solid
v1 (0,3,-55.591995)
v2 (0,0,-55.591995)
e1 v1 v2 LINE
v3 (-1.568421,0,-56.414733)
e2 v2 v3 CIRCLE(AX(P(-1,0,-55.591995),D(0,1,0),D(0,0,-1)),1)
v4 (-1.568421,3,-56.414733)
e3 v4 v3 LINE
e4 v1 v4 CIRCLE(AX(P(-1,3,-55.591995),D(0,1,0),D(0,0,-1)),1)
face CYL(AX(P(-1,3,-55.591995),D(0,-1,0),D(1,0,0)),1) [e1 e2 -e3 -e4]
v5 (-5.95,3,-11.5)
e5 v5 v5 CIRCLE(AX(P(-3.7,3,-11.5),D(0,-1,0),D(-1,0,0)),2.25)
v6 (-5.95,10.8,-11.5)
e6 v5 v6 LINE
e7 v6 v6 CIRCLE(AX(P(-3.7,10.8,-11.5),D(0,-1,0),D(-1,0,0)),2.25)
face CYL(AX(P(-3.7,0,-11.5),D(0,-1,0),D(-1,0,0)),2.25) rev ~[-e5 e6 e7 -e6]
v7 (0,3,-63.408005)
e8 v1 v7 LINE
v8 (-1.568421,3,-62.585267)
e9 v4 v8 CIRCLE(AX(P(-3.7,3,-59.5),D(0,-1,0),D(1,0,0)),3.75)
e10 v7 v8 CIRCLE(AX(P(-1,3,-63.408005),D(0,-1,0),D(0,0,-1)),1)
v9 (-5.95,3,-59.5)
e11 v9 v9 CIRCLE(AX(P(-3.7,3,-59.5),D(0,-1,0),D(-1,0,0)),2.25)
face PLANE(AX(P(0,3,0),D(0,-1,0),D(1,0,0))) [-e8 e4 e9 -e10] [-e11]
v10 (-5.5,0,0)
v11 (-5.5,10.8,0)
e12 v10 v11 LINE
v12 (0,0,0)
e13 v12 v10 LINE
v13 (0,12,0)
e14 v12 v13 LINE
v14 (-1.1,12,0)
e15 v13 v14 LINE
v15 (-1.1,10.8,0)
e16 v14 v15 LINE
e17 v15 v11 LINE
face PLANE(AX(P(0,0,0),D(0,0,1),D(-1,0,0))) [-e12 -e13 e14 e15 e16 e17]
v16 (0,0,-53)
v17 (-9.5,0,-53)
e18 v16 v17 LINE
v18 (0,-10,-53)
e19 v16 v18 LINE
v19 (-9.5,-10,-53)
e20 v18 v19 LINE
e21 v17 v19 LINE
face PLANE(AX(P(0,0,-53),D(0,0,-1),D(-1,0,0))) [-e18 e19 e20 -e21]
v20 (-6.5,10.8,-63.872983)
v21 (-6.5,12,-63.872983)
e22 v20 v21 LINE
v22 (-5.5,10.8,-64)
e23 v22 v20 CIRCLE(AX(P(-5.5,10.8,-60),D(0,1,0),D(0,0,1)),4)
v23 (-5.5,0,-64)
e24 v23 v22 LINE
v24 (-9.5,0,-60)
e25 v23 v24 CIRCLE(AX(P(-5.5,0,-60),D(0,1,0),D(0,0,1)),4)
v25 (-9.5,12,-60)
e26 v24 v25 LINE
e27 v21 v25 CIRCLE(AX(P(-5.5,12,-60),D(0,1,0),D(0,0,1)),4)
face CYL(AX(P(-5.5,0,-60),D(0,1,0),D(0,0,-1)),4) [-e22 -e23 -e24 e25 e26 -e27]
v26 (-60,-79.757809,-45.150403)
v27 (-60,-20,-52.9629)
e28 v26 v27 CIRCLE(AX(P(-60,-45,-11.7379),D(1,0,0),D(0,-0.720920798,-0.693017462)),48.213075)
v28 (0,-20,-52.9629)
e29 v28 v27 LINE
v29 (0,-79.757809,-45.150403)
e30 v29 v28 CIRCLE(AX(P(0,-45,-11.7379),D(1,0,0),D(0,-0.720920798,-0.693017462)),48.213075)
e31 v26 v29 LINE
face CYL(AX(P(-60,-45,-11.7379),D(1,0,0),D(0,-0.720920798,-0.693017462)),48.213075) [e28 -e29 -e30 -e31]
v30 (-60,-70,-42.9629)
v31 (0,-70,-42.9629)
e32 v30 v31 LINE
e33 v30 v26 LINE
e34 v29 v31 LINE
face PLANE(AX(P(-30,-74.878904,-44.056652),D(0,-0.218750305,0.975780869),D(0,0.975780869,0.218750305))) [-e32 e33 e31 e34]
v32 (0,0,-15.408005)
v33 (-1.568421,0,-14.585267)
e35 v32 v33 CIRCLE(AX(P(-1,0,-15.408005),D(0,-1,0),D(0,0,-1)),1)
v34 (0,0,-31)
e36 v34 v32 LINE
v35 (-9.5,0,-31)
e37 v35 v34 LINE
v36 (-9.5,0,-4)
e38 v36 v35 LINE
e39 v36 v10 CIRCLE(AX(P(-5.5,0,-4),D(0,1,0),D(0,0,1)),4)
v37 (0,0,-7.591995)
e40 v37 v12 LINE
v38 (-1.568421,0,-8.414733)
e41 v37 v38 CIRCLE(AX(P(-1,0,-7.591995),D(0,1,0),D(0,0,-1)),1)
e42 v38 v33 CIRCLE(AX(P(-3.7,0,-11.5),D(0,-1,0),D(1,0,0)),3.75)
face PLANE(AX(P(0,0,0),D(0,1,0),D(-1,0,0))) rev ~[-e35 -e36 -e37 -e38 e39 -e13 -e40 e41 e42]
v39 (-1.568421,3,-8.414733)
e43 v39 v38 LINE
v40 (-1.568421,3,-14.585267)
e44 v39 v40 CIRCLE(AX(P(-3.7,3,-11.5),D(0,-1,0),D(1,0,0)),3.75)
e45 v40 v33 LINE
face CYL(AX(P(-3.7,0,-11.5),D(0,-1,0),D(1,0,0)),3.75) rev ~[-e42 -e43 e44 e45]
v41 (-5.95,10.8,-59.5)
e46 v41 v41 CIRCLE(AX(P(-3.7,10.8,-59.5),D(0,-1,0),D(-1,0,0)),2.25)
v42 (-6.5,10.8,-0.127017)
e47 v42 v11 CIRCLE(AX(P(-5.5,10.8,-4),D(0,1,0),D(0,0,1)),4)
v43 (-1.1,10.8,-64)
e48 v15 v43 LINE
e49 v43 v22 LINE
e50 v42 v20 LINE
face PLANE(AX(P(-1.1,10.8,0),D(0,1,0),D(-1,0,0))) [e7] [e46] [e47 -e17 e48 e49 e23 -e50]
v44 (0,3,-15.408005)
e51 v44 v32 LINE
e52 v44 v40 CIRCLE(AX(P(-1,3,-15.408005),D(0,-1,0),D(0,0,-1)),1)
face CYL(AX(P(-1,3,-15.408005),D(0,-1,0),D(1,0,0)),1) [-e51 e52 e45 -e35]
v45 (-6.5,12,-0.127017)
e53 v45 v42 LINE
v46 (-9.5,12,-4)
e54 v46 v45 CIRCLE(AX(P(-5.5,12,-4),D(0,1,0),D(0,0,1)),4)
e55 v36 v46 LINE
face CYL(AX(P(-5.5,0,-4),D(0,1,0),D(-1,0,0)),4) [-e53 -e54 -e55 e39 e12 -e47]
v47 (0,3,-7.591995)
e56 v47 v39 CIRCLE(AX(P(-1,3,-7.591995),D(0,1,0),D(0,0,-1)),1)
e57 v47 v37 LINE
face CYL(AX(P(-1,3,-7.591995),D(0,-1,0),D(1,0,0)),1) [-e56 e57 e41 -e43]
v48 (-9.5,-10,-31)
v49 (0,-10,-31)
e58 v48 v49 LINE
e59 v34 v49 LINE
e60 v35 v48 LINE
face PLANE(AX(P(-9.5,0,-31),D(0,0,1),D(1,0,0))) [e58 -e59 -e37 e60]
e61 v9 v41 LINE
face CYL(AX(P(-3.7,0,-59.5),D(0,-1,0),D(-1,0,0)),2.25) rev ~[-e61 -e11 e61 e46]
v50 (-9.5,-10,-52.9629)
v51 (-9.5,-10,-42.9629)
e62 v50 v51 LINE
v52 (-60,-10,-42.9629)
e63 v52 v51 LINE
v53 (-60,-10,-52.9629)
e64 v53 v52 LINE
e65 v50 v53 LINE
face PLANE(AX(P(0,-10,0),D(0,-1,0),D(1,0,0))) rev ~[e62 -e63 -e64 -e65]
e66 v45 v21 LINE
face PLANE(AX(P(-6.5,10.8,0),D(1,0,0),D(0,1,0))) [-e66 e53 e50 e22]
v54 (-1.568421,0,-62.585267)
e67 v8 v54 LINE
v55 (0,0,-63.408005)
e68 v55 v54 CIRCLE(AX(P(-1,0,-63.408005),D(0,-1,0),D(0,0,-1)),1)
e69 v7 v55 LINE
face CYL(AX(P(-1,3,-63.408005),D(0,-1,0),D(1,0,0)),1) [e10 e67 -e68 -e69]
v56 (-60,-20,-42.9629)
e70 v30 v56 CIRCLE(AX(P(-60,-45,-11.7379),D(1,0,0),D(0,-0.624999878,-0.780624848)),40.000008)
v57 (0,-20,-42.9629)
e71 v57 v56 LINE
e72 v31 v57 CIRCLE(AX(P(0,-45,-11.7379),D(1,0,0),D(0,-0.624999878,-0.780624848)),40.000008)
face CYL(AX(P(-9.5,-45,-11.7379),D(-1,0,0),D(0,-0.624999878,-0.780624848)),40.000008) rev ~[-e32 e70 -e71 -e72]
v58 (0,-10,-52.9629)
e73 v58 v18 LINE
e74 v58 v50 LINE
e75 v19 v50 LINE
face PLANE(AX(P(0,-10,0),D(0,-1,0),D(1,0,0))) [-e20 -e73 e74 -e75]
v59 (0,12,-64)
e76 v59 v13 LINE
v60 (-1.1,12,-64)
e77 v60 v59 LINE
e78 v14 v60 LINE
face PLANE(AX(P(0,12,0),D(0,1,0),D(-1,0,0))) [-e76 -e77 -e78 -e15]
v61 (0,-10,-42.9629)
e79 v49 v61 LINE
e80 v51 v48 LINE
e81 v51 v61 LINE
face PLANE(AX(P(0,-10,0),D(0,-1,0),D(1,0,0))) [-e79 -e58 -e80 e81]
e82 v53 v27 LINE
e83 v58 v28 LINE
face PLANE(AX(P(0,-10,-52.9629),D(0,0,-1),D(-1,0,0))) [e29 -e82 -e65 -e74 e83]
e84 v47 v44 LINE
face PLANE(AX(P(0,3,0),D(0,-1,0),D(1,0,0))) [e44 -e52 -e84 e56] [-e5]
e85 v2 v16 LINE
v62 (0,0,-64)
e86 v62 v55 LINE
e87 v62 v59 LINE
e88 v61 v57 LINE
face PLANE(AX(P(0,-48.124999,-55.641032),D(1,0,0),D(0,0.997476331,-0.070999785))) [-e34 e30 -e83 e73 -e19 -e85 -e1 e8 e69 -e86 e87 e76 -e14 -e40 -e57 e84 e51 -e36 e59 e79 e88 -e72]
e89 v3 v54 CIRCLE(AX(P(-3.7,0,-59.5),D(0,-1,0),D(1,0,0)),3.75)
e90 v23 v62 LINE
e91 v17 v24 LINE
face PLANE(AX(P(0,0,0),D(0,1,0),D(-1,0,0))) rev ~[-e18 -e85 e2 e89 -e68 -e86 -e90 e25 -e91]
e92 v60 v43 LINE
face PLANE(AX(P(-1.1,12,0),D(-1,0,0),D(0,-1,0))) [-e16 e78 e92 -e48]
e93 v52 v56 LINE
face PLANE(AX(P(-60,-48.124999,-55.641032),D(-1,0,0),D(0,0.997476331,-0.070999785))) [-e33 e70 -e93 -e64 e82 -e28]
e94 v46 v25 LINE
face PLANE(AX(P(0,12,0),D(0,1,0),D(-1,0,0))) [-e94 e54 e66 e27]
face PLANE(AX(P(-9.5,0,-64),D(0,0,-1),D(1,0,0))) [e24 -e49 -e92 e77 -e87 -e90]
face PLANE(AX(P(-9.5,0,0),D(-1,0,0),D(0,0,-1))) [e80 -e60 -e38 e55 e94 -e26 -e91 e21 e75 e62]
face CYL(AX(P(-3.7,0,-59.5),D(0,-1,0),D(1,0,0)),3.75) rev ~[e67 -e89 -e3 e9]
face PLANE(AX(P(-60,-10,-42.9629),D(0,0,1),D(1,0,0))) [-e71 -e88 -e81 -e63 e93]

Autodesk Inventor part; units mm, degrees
ref_plane "YZ Plane" through (0, 0, 0) normal (1, 0, 0) x (0, 1, 0)
ref_plane "XZ Plane" through (0, 0, 0) normal (0, 1, 0) x (-1, 0, 0)
ref_plane "XY Plane" through (0, 0, 0) normal (0, 0, 1) x (1, 0, 0)
sketch "Sketch1" plane through (0, 0, 0) normal (0, 1, 0) x (-1, 0, 0)
  line L0 (0, 0) -> (9.5, 0)
  line L1 (9.5, 0) -> (9.5, -64)
  line L2 (9.5, -64) -> (0, -64)
  line L3 (0, -64) -> (0, 0)
  circle A0 centre (3.7, -11.5) radius 2.25
  circle A1 centre (3.7, -59.5) radius 2.25
  line L4 (3.7, -11.5) -> (3.7, -59.5) construction
  dimension "d1" = 9.5
  dimension "d2" = 64
  dimension "d3" = 4.5
  dimension "d4" = 48
  dimension "d6" = 3.7
  dimension "d17" = 4.5
extrude "Extrusion1" add sketch "Sketch1" along normal blind 12
sketch "Sketch2" plane through (-9.5, 0, 0) normal (0, 0, 1) x (1, 0, 0)
  line L0 (9.5, 12) -> (0, 12) projected
  line L1 (3, 12) -> (8.4, 12)
  line L2 (8.4, 12) -> (8.4, 10.8)
  line L3 (8.4, 10.8) -> (3, 10.8)
  line L4 (3, 10.8) -> (3, 12)
  line L5 (9.5, 0) -> (9.5, 12) projected
  line L6 (3.55, 0) -> (8.05, 0) projected
  line L7 (3.55, 12) -> (8.05, 12) projected
  line L8 (9.5, 0) -> (9.5, 12) projected
  line L9 (9.5, 0) -> (9.5, 12) projected
  line L10 (3.55, 12) -> (8.05, 12) projected
  line L11 (3.55, 12) -> (3.55, 0) projected
  line L12 (3.55, 12) -> (8.05, 12) projected
  line L13 (3.55, 0) -> (8.05, 0) projected
  line L14 (3.55, 12) -> (8.05, 12) projected
  line L15 (3.55, 0) -> (8.05, 0) projected
  line L16 (3.55, 12) -> (8.05, 12) projected
  line L17 (3.55, 0) -> (8.05, 0) projected
  dimension "d9" = 1.1
  dimension "d10" = 5.4
  dimension "d11" = 1.2
  dimension "d76" = 12
extrude "Extrusion2" cut sketch "Sketch2" against normal up to next
sketch "Sketch3" plane through (0, 0, 0) normal (0, -1, 0) x (1, 0, 0)
  circle A0 centre (-3.7, -11.5) radius 2.25 projected
  circle A1 centre (-3.7, -11.5) radius 3.75
  circle A2 centre (-3.7, -59.5) radius 2.25 projected
  circle A3 centre (-3.7, -59.5) radius 3.75
  point P0 (0, 0)
  dimension "d14" = 7.5
extrude "Extrusion3" cut sketch "Sketch3" against normal blind 3
fillet "Fillet1" radius 1 4 edges at (0, 1.5, -58.8897) (0, 1.5, -60.1103) (0, 1.5, -10.8897) (0, 1.5, -12.1103)
fillet "Fillet2" radius 4 2 edges at (-9.5, 6, -64) (-9.5, 6, 0)
sketch "Sketch17" plane through (0, 0, 0) normal (0, -1, 0) x (1, 0, 0)
  arc A0 (-1.5684, -56.4147) -> (0, -55.592) centre (-1, -55.592) ccw projected
  line L0 (0, -55.592) -> (0, -53)
  line L1 (0, -15.408) -> (0, -55.592) projected
  line L2 (-9.5, -60) -> (-9.5, -4) projected
  line L3 (0, -53) -> (-9.5, -53)
  line L4 (-9.5, -53) -> (-9.5, -31)
  line L5 (-9.5, -31) -> (0, -31)
  line L6 (0, -31) -> (0, -53)
  point P0 (0, 0)
  point P1 (0, -31)
  dimension "d90" = 2.592
  dimension "d91" = 22
extrude "Extrusion17" add sketch "Sketch17" along normal blind 10
sketch "Sketch18" plane through (0, -10, 0) normal (0, -1, 0) x (1, 0, 0)
  line L0 (0, -52.9629) -> (-60, -52.9629)
  line L1 (-60, -52.9629) -> (-60, -42.9629)
  line L2 (-60, -42.9629) -> (0, -42.9629)
  line L3 (0, -42.9629) -> (0, -52.9629)
  point P0 (0, 0)
  dimension "d94" = 60
  dimension "d95" = 10
extrude "Extrusion18" add sketch "Sketch18" along normal blind 10
sketch "Sketch19" plane through (0, -20, 0) normal (0, -1, 0) x (1, 0, 0)
  line L0 (-9.5, -42.9629) -> (0, -42.9629) projected
  line L1 (-60, -42.9629) -> (-60, -52.9629) projected
  line L2 (0, -42.9629) -> (-60, -42.9629)
  line L3 (-60, -42.9629) -> (-60, -52.9629)
  line L4 (-60, -52.9629) -> (0, -52.9629)
  line L5 (0, -52.9629) -> (0, -42.9629)
  point P0 (0, 0)
sketch "Sketch20" plane through (0, 0, -64) normal (1, 0, 0) x (0, 0, -1)
  line L0 (-11.0371, -20) -> (-21.0371, -20) projected
  arc A0 (-21.0371, -70) -> (-21.0371, -20) centre (-52.2621, -45) ccw
  point P0 (-64, 0)
  dimension "d98" = 50
  dimension "d99" = 40
sketch3d "3D Sketch1"
sweep "Sweep1" add profiles "Sketch19" path "Sketch20" path curves A0
properties part number "Front"
